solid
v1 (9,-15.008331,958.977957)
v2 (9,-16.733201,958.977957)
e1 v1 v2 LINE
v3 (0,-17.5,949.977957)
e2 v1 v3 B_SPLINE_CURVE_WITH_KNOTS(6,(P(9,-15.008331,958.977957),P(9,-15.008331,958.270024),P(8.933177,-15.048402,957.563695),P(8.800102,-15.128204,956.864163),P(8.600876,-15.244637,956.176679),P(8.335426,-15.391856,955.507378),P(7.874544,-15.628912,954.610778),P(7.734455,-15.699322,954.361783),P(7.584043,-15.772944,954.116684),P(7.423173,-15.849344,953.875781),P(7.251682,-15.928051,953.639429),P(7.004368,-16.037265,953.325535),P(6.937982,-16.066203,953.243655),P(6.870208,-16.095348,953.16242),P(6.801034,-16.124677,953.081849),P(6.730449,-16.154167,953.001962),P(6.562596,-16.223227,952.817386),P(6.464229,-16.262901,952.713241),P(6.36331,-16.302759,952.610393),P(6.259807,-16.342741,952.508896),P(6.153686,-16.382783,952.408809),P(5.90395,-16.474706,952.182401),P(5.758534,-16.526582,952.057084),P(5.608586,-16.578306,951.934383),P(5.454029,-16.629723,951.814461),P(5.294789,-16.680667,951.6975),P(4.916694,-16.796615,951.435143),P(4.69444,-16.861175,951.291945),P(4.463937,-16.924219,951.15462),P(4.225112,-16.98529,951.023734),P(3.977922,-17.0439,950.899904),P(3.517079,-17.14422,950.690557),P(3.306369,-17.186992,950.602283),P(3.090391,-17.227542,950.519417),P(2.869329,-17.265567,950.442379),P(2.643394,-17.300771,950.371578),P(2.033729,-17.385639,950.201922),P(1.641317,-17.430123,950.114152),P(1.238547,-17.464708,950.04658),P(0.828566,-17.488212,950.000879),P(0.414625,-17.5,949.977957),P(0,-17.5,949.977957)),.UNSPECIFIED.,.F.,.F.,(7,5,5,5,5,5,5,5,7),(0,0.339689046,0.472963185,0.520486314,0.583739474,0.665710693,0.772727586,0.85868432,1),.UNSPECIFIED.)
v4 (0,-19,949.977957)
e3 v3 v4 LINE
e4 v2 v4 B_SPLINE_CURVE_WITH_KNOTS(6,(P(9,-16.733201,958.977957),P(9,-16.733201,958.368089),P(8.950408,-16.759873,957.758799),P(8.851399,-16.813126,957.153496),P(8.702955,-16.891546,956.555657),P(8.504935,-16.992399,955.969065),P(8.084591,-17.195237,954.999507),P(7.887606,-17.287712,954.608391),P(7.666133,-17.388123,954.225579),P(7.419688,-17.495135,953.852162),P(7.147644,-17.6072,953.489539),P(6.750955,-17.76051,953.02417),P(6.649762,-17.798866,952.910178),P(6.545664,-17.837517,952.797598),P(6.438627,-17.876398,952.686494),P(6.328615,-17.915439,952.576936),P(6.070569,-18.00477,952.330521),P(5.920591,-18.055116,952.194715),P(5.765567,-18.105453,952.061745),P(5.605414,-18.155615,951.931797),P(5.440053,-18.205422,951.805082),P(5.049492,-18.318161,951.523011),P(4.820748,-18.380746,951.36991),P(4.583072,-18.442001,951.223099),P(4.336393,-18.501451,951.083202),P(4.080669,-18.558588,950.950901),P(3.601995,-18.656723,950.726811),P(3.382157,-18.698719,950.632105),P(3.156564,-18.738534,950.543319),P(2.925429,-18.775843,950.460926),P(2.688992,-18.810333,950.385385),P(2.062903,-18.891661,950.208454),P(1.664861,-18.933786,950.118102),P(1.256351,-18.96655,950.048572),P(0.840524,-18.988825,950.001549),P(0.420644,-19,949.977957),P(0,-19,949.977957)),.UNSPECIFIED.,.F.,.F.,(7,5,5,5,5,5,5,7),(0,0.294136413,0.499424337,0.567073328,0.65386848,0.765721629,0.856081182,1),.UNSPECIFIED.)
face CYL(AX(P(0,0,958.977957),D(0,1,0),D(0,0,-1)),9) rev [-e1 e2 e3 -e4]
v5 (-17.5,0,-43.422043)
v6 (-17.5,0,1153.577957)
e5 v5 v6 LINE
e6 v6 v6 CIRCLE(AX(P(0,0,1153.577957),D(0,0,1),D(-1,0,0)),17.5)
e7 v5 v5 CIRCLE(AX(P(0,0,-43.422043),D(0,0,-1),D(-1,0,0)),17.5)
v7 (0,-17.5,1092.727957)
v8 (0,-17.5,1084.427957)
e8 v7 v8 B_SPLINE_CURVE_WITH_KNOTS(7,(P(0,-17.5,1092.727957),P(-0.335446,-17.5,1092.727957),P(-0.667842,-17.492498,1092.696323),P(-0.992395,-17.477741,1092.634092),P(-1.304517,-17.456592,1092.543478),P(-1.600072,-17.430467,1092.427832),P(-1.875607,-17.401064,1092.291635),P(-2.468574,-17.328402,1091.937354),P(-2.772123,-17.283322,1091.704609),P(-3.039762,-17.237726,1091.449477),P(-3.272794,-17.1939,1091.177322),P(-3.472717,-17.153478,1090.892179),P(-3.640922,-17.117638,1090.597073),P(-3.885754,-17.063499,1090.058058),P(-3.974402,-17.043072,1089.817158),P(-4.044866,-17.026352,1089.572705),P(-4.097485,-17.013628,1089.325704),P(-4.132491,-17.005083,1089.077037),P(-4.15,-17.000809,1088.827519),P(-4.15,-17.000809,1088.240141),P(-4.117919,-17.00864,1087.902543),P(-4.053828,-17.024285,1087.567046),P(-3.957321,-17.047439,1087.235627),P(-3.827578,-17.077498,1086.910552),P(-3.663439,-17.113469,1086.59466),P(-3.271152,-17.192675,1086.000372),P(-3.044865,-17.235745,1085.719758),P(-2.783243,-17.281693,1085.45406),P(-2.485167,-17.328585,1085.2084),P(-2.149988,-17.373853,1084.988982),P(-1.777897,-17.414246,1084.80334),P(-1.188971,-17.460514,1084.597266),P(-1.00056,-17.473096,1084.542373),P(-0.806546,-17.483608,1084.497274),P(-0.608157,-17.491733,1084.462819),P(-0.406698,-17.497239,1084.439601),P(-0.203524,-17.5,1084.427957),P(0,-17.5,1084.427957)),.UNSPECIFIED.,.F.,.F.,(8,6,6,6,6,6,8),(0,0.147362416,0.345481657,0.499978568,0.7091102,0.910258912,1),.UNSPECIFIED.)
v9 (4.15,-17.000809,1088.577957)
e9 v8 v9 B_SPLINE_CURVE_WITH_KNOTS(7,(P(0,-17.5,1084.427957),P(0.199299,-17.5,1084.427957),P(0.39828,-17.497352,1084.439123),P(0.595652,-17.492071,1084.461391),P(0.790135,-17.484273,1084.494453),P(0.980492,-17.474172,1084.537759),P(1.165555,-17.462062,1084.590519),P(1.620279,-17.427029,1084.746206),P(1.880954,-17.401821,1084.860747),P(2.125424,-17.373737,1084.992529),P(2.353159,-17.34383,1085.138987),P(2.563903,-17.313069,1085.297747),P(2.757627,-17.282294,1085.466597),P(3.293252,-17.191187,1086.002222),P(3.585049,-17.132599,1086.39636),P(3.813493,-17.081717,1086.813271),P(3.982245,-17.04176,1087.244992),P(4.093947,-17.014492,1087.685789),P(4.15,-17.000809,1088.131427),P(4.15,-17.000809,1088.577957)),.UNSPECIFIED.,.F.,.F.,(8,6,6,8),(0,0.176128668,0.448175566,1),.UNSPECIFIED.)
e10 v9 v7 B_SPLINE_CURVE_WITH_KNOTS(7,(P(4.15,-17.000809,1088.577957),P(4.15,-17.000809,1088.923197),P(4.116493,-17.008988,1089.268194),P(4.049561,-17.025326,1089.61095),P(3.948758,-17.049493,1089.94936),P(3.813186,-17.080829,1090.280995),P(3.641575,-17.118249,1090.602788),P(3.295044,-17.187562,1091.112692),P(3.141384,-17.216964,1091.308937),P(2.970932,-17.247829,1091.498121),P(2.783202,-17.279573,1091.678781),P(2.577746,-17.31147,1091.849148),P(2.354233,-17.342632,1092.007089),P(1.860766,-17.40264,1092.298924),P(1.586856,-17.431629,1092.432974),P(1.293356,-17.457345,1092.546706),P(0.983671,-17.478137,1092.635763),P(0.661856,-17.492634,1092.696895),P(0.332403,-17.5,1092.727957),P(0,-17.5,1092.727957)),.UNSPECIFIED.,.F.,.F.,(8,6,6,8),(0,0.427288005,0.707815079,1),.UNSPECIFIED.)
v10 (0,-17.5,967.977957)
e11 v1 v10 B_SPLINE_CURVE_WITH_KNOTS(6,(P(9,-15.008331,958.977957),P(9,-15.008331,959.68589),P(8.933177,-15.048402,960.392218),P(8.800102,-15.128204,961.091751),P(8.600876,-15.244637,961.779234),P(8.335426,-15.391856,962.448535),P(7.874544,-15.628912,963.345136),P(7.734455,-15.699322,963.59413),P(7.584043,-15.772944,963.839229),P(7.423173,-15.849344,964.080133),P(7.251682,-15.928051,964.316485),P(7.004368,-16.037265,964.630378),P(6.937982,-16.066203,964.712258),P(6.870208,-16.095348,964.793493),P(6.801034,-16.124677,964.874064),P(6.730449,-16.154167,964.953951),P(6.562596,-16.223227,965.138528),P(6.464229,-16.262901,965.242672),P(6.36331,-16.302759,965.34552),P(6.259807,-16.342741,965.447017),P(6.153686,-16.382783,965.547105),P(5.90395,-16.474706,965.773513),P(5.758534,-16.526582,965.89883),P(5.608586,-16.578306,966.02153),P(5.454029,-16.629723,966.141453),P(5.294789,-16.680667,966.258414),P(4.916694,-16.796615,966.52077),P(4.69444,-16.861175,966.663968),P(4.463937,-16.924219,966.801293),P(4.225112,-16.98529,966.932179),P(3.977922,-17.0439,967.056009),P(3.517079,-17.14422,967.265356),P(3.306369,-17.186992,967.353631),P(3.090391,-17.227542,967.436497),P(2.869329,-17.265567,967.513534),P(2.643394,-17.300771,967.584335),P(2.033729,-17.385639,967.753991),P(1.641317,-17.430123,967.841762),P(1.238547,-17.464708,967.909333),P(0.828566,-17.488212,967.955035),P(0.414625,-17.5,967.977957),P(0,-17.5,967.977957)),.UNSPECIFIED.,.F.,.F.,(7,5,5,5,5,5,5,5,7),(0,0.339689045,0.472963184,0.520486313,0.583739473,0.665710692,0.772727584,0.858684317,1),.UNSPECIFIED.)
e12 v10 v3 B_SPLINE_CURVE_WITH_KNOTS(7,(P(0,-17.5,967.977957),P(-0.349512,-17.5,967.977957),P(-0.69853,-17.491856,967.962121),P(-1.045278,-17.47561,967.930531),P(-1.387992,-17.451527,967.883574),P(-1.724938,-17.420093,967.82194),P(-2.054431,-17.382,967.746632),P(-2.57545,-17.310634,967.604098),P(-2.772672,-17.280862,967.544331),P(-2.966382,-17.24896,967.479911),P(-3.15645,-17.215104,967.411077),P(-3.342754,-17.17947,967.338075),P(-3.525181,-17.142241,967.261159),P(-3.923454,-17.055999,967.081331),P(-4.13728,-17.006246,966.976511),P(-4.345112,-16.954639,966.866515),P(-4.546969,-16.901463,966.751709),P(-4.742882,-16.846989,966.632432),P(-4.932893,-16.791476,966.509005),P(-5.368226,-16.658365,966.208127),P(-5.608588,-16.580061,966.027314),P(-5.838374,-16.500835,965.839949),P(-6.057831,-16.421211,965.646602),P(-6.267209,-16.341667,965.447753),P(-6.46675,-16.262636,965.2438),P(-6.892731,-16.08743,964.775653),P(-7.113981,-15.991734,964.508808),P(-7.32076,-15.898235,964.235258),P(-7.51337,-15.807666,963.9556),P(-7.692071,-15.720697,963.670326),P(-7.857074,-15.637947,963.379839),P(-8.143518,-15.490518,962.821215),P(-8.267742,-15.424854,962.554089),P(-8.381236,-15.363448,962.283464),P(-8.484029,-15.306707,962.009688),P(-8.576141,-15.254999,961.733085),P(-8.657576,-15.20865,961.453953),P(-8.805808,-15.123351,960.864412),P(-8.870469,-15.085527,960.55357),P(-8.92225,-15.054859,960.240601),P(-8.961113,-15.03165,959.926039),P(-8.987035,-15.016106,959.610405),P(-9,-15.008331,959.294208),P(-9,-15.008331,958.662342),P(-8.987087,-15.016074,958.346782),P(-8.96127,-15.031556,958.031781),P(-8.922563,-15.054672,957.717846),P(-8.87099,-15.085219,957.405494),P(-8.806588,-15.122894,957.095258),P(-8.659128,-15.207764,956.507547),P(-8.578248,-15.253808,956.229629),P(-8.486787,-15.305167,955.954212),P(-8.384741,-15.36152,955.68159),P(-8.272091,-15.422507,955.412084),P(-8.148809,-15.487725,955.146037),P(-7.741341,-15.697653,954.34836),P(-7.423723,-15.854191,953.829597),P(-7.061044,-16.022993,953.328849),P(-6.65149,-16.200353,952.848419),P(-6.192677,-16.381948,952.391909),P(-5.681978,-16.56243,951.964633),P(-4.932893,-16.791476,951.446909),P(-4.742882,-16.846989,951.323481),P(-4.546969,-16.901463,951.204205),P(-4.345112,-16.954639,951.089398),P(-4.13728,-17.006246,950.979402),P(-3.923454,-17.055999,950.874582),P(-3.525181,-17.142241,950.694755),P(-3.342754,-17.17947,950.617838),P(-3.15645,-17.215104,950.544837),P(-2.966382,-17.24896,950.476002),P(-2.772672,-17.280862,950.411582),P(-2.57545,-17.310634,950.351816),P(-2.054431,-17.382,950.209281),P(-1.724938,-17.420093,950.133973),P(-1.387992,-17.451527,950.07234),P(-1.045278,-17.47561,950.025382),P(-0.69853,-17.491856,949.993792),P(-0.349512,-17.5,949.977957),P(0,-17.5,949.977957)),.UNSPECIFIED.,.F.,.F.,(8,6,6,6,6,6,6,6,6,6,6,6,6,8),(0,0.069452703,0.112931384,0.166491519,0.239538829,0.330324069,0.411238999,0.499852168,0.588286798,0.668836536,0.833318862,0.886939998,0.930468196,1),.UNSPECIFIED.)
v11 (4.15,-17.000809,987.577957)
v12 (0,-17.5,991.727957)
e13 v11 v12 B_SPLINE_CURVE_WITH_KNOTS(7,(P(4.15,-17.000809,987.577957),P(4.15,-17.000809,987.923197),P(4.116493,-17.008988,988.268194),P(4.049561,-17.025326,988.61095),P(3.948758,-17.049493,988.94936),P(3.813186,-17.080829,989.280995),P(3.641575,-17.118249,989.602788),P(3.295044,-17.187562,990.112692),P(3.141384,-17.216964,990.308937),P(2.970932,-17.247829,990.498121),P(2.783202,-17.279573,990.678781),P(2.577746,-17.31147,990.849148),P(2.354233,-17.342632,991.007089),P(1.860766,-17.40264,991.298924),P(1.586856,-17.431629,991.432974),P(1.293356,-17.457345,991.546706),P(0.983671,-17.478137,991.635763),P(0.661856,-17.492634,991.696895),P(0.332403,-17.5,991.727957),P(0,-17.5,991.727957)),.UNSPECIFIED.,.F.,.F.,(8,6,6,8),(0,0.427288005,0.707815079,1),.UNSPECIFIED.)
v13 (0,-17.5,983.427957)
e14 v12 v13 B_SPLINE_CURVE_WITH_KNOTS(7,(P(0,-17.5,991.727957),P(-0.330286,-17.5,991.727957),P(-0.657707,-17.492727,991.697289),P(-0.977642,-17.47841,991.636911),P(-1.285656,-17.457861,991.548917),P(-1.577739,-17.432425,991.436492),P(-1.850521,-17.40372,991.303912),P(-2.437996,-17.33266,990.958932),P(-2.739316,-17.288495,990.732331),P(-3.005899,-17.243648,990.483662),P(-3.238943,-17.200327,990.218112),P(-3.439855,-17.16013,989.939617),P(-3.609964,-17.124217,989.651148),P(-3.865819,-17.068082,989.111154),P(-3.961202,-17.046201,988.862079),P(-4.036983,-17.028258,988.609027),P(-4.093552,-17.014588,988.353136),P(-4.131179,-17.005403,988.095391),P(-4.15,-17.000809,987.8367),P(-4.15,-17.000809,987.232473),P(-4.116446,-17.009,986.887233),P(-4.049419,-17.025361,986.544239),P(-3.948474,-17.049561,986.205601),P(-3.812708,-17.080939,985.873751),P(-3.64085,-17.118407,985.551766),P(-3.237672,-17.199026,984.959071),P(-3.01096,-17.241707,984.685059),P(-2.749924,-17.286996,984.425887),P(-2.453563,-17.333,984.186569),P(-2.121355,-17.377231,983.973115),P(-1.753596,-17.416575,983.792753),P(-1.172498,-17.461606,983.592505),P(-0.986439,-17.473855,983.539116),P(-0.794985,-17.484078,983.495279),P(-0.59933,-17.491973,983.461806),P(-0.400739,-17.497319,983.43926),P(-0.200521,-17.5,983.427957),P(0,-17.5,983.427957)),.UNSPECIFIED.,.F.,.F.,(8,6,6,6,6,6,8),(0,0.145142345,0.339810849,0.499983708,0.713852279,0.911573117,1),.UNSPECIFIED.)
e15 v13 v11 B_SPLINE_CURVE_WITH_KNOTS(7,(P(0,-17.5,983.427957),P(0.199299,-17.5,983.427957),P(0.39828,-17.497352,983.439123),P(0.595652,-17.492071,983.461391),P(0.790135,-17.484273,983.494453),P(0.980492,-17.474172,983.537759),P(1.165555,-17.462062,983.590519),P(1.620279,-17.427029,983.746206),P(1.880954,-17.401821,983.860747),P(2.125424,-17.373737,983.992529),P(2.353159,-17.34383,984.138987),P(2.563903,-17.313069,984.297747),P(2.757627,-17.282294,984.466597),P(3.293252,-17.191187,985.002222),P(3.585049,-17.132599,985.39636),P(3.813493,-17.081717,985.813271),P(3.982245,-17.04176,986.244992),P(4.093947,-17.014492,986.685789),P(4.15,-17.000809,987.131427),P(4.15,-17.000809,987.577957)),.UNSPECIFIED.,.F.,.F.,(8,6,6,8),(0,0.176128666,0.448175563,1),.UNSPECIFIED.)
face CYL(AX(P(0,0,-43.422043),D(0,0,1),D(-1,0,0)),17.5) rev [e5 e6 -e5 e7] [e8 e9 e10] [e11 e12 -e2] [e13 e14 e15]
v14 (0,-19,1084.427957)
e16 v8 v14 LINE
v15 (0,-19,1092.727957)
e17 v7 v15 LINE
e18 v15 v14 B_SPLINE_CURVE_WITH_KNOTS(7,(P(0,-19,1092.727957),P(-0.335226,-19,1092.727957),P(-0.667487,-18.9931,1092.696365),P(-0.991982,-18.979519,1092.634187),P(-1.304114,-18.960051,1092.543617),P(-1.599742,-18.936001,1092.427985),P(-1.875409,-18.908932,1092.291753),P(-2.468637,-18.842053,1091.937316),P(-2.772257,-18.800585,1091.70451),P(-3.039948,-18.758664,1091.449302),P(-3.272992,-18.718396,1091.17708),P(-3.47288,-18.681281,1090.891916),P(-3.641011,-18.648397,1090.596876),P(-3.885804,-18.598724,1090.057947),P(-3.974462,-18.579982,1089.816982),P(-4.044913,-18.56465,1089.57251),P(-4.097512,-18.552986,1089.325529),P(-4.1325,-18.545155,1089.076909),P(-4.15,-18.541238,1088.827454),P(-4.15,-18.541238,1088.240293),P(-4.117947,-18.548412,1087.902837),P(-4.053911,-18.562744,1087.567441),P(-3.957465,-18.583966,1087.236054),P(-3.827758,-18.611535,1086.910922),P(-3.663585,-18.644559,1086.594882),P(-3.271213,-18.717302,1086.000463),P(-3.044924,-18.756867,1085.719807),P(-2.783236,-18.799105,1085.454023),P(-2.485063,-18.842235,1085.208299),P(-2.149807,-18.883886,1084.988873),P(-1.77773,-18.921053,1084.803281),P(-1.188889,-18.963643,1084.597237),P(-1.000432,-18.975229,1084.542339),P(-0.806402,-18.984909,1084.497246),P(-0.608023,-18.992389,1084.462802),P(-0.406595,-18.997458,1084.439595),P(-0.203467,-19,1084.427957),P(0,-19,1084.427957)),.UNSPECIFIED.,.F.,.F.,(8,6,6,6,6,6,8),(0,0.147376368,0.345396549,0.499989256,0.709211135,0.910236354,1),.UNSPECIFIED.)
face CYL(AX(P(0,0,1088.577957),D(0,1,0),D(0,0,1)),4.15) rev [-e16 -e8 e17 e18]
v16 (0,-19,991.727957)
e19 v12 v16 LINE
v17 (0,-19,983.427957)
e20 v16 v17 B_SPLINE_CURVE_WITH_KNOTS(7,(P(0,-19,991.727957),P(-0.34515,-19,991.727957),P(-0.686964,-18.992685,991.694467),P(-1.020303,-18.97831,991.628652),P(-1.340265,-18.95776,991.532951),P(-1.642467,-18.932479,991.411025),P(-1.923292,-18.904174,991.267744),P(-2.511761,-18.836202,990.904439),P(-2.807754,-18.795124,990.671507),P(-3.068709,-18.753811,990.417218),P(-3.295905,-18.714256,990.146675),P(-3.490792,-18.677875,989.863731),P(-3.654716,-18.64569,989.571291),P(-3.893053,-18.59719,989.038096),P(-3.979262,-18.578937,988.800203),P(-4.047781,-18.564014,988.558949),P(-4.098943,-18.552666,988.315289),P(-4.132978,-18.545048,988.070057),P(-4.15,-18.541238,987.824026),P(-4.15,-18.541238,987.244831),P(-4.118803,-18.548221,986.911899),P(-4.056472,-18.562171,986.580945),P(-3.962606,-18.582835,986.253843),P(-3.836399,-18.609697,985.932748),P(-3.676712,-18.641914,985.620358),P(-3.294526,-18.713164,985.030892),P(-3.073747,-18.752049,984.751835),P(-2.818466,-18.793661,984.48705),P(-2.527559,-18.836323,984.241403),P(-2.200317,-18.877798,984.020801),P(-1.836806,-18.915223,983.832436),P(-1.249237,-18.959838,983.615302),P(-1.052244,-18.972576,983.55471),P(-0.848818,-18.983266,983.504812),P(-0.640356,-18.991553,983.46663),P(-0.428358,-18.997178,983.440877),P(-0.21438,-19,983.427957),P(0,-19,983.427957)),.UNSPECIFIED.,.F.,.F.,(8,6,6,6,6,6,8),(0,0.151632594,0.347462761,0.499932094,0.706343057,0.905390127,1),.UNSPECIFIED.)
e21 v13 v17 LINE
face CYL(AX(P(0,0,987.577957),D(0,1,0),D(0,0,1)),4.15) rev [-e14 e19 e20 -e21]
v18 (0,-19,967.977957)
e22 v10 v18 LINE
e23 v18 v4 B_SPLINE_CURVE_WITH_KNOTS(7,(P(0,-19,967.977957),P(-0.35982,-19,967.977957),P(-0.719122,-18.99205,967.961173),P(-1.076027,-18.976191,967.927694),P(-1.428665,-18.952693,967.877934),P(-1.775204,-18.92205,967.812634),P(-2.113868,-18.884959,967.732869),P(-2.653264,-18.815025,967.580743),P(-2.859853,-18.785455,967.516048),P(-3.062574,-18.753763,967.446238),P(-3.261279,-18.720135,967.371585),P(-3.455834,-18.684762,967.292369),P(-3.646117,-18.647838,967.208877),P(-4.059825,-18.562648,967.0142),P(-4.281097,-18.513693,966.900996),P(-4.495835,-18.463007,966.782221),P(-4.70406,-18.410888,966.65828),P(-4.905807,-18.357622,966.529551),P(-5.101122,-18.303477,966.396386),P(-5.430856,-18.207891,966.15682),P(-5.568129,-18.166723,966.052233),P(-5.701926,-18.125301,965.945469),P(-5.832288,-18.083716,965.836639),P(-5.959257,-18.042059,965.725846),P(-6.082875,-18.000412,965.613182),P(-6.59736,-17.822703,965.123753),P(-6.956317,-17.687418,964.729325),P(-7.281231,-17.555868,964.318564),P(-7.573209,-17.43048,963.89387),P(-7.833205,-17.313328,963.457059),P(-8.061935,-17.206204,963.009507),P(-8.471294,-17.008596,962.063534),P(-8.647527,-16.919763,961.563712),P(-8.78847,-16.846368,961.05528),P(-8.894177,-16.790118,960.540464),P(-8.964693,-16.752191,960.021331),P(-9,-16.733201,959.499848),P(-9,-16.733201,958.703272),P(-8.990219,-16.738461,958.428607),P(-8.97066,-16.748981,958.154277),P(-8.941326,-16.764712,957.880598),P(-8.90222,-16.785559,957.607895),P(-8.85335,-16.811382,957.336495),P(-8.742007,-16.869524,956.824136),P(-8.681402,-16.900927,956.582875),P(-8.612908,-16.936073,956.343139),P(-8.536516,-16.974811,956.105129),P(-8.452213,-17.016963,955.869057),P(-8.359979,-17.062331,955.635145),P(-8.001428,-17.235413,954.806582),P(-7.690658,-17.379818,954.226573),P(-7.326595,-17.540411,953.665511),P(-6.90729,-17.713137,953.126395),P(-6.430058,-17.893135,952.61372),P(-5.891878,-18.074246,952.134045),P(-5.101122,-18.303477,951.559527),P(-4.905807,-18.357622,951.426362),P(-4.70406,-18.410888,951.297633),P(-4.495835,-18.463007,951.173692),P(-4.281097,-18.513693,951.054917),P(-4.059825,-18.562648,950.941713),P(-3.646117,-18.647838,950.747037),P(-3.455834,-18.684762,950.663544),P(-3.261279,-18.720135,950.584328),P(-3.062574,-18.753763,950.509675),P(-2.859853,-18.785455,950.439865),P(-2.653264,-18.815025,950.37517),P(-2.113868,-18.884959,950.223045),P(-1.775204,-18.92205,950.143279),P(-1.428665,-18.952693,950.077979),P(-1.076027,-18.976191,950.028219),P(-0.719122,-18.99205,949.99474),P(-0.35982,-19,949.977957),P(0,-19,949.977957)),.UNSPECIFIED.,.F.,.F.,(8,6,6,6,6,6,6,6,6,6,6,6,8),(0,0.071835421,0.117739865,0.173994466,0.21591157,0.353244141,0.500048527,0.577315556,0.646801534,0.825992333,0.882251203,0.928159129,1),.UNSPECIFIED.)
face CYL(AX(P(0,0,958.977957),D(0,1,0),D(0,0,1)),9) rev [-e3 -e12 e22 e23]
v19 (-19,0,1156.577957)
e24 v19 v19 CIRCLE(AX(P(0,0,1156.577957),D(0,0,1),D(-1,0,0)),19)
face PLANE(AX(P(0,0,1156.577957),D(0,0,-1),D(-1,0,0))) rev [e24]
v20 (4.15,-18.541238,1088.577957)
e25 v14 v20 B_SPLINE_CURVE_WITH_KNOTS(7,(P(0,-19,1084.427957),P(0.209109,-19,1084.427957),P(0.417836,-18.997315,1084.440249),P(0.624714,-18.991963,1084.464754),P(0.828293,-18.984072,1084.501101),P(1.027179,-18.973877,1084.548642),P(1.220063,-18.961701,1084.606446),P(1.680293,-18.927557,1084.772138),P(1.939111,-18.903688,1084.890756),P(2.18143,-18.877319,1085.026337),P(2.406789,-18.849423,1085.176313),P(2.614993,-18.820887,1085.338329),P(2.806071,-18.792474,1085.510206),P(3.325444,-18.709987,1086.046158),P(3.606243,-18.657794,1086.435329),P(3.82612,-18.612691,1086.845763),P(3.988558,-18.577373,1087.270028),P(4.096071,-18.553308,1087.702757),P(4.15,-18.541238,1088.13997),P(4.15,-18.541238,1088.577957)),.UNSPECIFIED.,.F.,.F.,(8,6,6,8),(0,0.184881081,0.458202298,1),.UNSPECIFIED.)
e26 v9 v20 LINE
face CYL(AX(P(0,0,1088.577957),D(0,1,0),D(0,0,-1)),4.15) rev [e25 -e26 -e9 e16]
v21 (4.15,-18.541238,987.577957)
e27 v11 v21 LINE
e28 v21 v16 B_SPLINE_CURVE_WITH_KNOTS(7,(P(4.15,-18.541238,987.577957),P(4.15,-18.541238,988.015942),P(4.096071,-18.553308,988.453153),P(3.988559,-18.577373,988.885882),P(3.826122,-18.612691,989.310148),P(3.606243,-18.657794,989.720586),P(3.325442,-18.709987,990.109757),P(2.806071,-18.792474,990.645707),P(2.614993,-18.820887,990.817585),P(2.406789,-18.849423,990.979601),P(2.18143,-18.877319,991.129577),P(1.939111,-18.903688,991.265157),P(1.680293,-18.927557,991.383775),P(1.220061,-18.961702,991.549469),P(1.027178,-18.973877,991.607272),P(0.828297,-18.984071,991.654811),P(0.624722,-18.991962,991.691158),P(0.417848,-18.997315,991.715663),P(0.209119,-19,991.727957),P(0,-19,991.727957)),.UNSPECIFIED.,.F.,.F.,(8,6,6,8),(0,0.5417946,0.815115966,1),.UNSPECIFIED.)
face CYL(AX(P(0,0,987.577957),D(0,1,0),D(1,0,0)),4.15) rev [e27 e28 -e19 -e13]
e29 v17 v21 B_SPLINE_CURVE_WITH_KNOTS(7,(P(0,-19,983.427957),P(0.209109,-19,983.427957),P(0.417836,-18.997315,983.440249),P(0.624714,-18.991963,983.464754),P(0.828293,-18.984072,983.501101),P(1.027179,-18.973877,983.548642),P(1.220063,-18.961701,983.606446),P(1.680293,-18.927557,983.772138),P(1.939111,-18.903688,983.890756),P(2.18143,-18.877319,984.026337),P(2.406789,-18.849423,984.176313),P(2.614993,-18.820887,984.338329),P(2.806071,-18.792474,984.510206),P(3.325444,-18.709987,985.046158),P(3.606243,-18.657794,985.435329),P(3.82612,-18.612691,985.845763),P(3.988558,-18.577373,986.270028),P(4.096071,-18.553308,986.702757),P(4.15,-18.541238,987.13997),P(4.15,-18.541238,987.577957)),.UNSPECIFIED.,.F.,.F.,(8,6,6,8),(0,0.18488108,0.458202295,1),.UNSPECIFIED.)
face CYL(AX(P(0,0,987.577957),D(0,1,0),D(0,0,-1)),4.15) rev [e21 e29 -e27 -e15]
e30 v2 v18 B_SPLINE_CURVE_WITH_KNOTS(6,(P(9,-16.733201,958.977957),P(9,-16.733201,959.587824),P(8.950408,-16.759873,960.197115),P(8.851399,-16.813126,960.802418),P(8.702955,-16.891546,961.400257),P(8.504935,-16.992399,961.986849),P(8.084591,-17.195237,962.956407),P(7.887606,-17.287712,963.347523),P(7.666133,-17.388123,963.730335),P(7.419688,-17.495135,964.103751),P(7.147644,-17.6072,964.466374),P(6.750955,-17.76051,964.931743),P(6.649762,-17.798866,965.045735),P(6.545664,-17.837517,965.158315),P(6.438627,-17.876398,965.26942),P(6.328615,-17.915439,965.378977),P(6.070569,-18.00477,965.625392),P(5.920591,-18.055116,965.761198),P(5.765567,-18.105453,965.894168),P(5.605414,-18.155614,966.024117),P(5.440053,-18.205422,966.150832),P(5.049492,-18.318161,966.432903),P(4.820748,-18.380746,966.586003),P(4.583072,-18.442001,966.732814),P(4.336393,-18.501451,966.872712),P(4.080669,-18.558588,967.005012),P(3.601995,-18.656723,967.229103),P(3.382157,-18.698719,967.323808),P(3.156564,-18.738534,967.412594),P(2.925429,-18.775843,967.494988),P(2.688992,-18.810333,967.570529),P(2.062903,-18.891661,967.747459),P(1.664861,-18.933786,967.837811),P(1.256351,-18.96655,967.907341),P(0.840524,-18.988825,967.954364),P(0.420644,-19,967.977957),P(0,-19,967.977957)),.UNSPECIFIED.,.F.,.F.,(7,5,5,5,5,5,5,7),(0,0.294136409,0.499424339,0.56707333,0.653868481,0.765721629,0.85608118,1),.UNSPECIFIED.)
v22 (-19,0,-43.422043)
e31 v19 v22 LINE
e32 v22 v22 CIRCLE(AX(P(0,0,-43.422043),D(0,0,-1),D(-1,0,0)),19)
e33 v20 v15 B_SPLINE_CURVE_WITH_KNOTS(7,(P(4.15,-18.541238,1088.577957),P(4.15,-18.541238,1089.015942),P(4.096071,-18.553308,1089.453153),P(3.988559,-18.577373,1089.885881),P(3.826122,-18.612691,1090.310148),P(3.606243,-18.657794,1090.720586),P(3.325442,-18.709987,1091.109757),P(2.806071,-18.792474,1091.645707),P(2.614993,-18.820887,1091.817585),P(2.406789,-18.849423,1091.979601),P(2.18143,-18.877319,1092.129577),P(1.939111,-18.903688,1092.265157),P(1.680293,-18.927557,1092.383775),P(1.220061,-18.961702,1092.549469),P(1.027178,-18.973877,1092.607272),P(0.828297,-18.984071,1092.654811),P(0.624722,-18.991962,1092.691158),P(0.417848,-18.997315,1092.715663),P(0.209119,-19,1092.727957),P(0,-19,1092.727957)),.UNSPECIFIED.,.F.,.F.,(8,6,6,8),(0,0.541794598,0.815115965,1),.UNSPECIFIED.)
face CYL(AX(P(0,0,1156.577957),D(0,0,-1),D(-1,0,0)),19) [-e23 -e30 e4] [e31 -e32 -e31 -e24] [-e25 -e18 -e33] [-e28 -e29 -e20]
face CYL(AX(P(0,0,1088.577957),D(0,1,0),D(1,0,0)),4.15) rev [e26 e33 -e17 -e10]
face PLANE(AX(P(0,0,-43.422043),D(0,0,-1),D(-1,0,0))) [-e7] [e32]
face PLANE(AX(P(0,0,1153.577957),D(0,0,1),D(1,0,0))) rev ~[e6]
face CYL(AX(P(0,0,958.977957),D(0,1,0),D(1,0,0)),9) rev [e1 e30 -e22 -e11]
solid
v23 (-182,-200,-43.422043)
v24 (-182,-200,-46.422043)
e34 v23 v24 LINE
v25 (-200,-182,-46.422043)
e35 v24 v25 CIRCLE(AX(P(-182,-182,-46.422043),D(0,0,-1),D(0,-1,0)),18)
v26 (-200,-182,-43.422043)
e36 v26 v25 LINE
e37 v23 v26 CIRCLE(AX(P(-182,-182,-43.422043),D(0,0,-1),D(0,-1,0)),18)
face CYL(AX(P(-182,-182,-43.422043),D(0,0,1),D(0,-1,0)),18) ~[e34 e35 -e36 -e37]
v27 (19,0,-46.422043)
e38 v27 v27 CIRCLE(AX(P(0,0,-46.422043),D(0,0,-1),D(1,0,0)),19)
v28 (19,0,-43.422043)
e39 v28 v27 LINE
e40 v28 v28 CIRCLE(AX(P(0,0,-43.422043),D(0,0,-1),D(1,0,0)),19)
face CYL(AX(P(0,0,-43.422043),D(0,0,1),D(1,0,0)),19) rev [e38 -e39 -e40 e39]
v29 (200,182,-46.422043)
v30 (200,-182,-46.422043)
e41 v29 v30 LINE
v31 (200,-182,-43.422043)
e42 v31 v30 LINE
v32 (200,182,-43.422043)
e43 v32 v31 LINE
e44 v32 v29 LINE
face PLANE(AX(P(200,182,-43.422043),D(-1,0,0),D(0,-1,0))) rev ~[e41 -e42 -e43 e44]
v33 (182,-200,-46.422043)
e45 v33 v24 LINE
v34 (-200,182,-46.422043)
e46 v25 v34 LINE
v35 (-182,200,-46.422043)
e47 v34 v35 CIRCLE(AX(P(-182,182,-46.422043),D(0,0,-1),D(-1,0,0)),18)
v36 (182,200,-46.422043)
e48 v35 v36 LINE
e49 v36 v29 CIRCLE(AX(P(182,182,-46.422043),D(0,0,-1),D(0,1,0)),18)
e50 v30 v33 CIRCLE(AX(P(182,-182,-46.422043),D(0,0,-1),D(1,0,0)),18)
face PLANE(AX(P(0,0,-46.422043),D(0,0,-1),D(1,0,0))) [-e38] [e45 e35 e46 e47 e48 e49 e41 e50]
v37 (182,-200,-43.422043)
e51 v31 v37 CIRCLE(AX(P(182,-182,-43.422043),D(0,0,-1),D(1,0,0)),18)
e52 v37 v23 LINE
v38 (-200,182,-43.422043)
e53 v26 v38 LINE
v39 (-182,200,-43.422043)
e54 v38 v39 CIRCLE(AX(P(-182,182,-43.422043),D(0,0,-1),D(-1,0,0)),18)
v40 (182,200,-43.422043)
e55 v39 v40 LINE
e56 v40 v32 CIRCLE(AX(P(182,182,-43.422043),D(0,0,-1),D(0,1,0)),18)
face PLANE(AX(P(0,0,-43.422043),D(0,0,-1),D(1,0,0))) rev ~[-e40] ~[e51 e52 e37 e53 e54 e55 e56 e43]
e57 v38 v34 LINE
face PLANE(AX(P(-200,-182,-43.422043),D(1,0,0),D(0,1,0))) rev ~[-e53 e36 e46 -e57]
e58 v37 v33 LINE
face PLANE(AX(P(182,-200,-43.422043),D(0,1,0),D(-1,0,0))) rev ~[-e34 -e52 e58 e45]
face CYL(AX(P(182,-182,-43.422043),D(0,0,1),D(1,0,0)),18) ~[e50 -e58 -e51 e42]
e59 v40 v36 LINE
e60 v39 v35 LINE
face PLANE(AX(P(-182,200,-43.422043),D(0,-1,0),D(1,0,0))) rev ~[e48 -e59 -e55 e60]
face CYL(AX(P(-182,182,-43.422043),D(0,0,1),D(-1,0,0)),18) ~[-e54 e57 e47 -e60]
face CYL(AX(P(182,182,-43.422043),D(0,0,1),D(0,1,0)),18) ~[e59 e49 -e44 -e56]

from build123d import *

# Parameters (mm, degrees)
F2_DEPTH = 19.001
F3_DEPTH = 19.0010001
F4_DEPTH = 19.0010001
F5_R     = 19
F6_DEPTH = 3
F7_R     = 19
F8_DEPTH = 3


with BuildPart() as f1:
    # F0 (on Front) → F1 (revolve)
    with BuildSketch(Plane.XZ):
        Polygon((-17.5, -43.4220433303), (-17.5, 1156.5779566697), (-19, 1156.5779566697), (-19, -41.8273694813), (-19, -43.4220433303), align=None)
    revolve(axis=Axis((0, 0, 1124.6529566697), (0, 0, -1)))

    # F0 (on Front) → F2 (cut, through all)
    with BuildSketch(Plane.XZ):
        with BuildLine():
            ThreePointArc((4.15, 987.5779566697), (2.9344931419, 990.5124498116), (0, 991.7279566697))
            ThreePointArc((0, 991.7279566697), (-4.15, 987.5779566697), (0, 983.4279566697))
            ThreePointArc((0, 983.4279566697), (2.9344931419, 984.6434635278), (4.15, 987.5779566697))
        make_face()
        with BuildLine():
            ThreePointArc((0, 967.9779566697), (-9, 958.9779566697), (0, 949.9779566697))
            ThreePointArc((0, 949.9779566697), (6.3639610307, 952.613995639), (9, 958.9779566697))
            ThreePointArc((9, 958.9779566697), (6.3639610307, 965.3419177004), (0, 967.9779566697))
        make_face()
    extrude(amount=F2_DEPTH, mode=Mode.SUBTRACT)

    # F0 (on Front) → F3 (cut, through all)
    with BuildSketch(Plane.XZ):
        with BuildLine():
            ThreePointArc((4.15, 1088.5779566697), (2.9344931419, 1091.5124498116), (0, 1092.7279566697))
            ThreePointArc((0, 1092.7279566697), (-4.15, 1088.5779566697), (0, 1084.4279566697))
            ThreePointArc((0, 1084.4279566697), (2.9344931419, 1085.6434635278), (4.15, 1088.5779566697))
        make_face()
    extrude(amount=F3_DEPTH, mode=Mode.SUBTRACT)

    # F0 (on Front) → F4 (cut, through all)
    with BuildSketch(Plane.XZ):
        with BuildLine():
            ThreePointArc((0, 967.9779566697), (-9, 958.9779566697), (0, 949.9779566697))
            ThreePointArc((0, 949.9779566697), (6.3639610307, 952.613995639), (9, 958.9779566697))
            ThreePointArc((9, 958.9779566697), (6.3639610307, 965.3419177004), (0, 967.9779566697))
        make_face()
    extrude(amount=F4_DEPTH, mode=Mode.SUBTRACT)

    # F7 (on face) → F8 (join)
    with BuildSketch(Plane.XY.offset(1156.5779566697)):
        Circle(F7_R)
    extrude(amount=-F8_DEPTH)


with BuildPart() as f6:
    # F5 (on face) → F6 (new body)
    with BuildSketch(Plane(origin=(0, 0, -43.4220433303), x_dir=(1, 0, 0), z_dir=(0, 0, -1))):
        with BuildLine():
            Line((182, 200), (-182, 200))
            ThreePointArc((-182, 200), (-194.7279220614, 194.7279220614), (-200, 182))
            Line((-200, 182), (-200, -182))
            ThreePointArc((-200, -182), (-194.7279220614, -194.7279220614), (-182, -200))
            Line((-182, -200), (182, -200))
            ThreePointArc((182, -200), (194.7279220614, -194.7279220614), (200, -182))
            Line((200, -182), (200, 182))
            ThreePointArc((200, 182), (194.7279220614, 194.7279220614), (182, 200))
        make_face()
        Circle(F5_R, mode=Mode.SUBTRACT)
    extrude(amount=F6_DEPTH)


solid = Compound([f1.part, f6.part])
